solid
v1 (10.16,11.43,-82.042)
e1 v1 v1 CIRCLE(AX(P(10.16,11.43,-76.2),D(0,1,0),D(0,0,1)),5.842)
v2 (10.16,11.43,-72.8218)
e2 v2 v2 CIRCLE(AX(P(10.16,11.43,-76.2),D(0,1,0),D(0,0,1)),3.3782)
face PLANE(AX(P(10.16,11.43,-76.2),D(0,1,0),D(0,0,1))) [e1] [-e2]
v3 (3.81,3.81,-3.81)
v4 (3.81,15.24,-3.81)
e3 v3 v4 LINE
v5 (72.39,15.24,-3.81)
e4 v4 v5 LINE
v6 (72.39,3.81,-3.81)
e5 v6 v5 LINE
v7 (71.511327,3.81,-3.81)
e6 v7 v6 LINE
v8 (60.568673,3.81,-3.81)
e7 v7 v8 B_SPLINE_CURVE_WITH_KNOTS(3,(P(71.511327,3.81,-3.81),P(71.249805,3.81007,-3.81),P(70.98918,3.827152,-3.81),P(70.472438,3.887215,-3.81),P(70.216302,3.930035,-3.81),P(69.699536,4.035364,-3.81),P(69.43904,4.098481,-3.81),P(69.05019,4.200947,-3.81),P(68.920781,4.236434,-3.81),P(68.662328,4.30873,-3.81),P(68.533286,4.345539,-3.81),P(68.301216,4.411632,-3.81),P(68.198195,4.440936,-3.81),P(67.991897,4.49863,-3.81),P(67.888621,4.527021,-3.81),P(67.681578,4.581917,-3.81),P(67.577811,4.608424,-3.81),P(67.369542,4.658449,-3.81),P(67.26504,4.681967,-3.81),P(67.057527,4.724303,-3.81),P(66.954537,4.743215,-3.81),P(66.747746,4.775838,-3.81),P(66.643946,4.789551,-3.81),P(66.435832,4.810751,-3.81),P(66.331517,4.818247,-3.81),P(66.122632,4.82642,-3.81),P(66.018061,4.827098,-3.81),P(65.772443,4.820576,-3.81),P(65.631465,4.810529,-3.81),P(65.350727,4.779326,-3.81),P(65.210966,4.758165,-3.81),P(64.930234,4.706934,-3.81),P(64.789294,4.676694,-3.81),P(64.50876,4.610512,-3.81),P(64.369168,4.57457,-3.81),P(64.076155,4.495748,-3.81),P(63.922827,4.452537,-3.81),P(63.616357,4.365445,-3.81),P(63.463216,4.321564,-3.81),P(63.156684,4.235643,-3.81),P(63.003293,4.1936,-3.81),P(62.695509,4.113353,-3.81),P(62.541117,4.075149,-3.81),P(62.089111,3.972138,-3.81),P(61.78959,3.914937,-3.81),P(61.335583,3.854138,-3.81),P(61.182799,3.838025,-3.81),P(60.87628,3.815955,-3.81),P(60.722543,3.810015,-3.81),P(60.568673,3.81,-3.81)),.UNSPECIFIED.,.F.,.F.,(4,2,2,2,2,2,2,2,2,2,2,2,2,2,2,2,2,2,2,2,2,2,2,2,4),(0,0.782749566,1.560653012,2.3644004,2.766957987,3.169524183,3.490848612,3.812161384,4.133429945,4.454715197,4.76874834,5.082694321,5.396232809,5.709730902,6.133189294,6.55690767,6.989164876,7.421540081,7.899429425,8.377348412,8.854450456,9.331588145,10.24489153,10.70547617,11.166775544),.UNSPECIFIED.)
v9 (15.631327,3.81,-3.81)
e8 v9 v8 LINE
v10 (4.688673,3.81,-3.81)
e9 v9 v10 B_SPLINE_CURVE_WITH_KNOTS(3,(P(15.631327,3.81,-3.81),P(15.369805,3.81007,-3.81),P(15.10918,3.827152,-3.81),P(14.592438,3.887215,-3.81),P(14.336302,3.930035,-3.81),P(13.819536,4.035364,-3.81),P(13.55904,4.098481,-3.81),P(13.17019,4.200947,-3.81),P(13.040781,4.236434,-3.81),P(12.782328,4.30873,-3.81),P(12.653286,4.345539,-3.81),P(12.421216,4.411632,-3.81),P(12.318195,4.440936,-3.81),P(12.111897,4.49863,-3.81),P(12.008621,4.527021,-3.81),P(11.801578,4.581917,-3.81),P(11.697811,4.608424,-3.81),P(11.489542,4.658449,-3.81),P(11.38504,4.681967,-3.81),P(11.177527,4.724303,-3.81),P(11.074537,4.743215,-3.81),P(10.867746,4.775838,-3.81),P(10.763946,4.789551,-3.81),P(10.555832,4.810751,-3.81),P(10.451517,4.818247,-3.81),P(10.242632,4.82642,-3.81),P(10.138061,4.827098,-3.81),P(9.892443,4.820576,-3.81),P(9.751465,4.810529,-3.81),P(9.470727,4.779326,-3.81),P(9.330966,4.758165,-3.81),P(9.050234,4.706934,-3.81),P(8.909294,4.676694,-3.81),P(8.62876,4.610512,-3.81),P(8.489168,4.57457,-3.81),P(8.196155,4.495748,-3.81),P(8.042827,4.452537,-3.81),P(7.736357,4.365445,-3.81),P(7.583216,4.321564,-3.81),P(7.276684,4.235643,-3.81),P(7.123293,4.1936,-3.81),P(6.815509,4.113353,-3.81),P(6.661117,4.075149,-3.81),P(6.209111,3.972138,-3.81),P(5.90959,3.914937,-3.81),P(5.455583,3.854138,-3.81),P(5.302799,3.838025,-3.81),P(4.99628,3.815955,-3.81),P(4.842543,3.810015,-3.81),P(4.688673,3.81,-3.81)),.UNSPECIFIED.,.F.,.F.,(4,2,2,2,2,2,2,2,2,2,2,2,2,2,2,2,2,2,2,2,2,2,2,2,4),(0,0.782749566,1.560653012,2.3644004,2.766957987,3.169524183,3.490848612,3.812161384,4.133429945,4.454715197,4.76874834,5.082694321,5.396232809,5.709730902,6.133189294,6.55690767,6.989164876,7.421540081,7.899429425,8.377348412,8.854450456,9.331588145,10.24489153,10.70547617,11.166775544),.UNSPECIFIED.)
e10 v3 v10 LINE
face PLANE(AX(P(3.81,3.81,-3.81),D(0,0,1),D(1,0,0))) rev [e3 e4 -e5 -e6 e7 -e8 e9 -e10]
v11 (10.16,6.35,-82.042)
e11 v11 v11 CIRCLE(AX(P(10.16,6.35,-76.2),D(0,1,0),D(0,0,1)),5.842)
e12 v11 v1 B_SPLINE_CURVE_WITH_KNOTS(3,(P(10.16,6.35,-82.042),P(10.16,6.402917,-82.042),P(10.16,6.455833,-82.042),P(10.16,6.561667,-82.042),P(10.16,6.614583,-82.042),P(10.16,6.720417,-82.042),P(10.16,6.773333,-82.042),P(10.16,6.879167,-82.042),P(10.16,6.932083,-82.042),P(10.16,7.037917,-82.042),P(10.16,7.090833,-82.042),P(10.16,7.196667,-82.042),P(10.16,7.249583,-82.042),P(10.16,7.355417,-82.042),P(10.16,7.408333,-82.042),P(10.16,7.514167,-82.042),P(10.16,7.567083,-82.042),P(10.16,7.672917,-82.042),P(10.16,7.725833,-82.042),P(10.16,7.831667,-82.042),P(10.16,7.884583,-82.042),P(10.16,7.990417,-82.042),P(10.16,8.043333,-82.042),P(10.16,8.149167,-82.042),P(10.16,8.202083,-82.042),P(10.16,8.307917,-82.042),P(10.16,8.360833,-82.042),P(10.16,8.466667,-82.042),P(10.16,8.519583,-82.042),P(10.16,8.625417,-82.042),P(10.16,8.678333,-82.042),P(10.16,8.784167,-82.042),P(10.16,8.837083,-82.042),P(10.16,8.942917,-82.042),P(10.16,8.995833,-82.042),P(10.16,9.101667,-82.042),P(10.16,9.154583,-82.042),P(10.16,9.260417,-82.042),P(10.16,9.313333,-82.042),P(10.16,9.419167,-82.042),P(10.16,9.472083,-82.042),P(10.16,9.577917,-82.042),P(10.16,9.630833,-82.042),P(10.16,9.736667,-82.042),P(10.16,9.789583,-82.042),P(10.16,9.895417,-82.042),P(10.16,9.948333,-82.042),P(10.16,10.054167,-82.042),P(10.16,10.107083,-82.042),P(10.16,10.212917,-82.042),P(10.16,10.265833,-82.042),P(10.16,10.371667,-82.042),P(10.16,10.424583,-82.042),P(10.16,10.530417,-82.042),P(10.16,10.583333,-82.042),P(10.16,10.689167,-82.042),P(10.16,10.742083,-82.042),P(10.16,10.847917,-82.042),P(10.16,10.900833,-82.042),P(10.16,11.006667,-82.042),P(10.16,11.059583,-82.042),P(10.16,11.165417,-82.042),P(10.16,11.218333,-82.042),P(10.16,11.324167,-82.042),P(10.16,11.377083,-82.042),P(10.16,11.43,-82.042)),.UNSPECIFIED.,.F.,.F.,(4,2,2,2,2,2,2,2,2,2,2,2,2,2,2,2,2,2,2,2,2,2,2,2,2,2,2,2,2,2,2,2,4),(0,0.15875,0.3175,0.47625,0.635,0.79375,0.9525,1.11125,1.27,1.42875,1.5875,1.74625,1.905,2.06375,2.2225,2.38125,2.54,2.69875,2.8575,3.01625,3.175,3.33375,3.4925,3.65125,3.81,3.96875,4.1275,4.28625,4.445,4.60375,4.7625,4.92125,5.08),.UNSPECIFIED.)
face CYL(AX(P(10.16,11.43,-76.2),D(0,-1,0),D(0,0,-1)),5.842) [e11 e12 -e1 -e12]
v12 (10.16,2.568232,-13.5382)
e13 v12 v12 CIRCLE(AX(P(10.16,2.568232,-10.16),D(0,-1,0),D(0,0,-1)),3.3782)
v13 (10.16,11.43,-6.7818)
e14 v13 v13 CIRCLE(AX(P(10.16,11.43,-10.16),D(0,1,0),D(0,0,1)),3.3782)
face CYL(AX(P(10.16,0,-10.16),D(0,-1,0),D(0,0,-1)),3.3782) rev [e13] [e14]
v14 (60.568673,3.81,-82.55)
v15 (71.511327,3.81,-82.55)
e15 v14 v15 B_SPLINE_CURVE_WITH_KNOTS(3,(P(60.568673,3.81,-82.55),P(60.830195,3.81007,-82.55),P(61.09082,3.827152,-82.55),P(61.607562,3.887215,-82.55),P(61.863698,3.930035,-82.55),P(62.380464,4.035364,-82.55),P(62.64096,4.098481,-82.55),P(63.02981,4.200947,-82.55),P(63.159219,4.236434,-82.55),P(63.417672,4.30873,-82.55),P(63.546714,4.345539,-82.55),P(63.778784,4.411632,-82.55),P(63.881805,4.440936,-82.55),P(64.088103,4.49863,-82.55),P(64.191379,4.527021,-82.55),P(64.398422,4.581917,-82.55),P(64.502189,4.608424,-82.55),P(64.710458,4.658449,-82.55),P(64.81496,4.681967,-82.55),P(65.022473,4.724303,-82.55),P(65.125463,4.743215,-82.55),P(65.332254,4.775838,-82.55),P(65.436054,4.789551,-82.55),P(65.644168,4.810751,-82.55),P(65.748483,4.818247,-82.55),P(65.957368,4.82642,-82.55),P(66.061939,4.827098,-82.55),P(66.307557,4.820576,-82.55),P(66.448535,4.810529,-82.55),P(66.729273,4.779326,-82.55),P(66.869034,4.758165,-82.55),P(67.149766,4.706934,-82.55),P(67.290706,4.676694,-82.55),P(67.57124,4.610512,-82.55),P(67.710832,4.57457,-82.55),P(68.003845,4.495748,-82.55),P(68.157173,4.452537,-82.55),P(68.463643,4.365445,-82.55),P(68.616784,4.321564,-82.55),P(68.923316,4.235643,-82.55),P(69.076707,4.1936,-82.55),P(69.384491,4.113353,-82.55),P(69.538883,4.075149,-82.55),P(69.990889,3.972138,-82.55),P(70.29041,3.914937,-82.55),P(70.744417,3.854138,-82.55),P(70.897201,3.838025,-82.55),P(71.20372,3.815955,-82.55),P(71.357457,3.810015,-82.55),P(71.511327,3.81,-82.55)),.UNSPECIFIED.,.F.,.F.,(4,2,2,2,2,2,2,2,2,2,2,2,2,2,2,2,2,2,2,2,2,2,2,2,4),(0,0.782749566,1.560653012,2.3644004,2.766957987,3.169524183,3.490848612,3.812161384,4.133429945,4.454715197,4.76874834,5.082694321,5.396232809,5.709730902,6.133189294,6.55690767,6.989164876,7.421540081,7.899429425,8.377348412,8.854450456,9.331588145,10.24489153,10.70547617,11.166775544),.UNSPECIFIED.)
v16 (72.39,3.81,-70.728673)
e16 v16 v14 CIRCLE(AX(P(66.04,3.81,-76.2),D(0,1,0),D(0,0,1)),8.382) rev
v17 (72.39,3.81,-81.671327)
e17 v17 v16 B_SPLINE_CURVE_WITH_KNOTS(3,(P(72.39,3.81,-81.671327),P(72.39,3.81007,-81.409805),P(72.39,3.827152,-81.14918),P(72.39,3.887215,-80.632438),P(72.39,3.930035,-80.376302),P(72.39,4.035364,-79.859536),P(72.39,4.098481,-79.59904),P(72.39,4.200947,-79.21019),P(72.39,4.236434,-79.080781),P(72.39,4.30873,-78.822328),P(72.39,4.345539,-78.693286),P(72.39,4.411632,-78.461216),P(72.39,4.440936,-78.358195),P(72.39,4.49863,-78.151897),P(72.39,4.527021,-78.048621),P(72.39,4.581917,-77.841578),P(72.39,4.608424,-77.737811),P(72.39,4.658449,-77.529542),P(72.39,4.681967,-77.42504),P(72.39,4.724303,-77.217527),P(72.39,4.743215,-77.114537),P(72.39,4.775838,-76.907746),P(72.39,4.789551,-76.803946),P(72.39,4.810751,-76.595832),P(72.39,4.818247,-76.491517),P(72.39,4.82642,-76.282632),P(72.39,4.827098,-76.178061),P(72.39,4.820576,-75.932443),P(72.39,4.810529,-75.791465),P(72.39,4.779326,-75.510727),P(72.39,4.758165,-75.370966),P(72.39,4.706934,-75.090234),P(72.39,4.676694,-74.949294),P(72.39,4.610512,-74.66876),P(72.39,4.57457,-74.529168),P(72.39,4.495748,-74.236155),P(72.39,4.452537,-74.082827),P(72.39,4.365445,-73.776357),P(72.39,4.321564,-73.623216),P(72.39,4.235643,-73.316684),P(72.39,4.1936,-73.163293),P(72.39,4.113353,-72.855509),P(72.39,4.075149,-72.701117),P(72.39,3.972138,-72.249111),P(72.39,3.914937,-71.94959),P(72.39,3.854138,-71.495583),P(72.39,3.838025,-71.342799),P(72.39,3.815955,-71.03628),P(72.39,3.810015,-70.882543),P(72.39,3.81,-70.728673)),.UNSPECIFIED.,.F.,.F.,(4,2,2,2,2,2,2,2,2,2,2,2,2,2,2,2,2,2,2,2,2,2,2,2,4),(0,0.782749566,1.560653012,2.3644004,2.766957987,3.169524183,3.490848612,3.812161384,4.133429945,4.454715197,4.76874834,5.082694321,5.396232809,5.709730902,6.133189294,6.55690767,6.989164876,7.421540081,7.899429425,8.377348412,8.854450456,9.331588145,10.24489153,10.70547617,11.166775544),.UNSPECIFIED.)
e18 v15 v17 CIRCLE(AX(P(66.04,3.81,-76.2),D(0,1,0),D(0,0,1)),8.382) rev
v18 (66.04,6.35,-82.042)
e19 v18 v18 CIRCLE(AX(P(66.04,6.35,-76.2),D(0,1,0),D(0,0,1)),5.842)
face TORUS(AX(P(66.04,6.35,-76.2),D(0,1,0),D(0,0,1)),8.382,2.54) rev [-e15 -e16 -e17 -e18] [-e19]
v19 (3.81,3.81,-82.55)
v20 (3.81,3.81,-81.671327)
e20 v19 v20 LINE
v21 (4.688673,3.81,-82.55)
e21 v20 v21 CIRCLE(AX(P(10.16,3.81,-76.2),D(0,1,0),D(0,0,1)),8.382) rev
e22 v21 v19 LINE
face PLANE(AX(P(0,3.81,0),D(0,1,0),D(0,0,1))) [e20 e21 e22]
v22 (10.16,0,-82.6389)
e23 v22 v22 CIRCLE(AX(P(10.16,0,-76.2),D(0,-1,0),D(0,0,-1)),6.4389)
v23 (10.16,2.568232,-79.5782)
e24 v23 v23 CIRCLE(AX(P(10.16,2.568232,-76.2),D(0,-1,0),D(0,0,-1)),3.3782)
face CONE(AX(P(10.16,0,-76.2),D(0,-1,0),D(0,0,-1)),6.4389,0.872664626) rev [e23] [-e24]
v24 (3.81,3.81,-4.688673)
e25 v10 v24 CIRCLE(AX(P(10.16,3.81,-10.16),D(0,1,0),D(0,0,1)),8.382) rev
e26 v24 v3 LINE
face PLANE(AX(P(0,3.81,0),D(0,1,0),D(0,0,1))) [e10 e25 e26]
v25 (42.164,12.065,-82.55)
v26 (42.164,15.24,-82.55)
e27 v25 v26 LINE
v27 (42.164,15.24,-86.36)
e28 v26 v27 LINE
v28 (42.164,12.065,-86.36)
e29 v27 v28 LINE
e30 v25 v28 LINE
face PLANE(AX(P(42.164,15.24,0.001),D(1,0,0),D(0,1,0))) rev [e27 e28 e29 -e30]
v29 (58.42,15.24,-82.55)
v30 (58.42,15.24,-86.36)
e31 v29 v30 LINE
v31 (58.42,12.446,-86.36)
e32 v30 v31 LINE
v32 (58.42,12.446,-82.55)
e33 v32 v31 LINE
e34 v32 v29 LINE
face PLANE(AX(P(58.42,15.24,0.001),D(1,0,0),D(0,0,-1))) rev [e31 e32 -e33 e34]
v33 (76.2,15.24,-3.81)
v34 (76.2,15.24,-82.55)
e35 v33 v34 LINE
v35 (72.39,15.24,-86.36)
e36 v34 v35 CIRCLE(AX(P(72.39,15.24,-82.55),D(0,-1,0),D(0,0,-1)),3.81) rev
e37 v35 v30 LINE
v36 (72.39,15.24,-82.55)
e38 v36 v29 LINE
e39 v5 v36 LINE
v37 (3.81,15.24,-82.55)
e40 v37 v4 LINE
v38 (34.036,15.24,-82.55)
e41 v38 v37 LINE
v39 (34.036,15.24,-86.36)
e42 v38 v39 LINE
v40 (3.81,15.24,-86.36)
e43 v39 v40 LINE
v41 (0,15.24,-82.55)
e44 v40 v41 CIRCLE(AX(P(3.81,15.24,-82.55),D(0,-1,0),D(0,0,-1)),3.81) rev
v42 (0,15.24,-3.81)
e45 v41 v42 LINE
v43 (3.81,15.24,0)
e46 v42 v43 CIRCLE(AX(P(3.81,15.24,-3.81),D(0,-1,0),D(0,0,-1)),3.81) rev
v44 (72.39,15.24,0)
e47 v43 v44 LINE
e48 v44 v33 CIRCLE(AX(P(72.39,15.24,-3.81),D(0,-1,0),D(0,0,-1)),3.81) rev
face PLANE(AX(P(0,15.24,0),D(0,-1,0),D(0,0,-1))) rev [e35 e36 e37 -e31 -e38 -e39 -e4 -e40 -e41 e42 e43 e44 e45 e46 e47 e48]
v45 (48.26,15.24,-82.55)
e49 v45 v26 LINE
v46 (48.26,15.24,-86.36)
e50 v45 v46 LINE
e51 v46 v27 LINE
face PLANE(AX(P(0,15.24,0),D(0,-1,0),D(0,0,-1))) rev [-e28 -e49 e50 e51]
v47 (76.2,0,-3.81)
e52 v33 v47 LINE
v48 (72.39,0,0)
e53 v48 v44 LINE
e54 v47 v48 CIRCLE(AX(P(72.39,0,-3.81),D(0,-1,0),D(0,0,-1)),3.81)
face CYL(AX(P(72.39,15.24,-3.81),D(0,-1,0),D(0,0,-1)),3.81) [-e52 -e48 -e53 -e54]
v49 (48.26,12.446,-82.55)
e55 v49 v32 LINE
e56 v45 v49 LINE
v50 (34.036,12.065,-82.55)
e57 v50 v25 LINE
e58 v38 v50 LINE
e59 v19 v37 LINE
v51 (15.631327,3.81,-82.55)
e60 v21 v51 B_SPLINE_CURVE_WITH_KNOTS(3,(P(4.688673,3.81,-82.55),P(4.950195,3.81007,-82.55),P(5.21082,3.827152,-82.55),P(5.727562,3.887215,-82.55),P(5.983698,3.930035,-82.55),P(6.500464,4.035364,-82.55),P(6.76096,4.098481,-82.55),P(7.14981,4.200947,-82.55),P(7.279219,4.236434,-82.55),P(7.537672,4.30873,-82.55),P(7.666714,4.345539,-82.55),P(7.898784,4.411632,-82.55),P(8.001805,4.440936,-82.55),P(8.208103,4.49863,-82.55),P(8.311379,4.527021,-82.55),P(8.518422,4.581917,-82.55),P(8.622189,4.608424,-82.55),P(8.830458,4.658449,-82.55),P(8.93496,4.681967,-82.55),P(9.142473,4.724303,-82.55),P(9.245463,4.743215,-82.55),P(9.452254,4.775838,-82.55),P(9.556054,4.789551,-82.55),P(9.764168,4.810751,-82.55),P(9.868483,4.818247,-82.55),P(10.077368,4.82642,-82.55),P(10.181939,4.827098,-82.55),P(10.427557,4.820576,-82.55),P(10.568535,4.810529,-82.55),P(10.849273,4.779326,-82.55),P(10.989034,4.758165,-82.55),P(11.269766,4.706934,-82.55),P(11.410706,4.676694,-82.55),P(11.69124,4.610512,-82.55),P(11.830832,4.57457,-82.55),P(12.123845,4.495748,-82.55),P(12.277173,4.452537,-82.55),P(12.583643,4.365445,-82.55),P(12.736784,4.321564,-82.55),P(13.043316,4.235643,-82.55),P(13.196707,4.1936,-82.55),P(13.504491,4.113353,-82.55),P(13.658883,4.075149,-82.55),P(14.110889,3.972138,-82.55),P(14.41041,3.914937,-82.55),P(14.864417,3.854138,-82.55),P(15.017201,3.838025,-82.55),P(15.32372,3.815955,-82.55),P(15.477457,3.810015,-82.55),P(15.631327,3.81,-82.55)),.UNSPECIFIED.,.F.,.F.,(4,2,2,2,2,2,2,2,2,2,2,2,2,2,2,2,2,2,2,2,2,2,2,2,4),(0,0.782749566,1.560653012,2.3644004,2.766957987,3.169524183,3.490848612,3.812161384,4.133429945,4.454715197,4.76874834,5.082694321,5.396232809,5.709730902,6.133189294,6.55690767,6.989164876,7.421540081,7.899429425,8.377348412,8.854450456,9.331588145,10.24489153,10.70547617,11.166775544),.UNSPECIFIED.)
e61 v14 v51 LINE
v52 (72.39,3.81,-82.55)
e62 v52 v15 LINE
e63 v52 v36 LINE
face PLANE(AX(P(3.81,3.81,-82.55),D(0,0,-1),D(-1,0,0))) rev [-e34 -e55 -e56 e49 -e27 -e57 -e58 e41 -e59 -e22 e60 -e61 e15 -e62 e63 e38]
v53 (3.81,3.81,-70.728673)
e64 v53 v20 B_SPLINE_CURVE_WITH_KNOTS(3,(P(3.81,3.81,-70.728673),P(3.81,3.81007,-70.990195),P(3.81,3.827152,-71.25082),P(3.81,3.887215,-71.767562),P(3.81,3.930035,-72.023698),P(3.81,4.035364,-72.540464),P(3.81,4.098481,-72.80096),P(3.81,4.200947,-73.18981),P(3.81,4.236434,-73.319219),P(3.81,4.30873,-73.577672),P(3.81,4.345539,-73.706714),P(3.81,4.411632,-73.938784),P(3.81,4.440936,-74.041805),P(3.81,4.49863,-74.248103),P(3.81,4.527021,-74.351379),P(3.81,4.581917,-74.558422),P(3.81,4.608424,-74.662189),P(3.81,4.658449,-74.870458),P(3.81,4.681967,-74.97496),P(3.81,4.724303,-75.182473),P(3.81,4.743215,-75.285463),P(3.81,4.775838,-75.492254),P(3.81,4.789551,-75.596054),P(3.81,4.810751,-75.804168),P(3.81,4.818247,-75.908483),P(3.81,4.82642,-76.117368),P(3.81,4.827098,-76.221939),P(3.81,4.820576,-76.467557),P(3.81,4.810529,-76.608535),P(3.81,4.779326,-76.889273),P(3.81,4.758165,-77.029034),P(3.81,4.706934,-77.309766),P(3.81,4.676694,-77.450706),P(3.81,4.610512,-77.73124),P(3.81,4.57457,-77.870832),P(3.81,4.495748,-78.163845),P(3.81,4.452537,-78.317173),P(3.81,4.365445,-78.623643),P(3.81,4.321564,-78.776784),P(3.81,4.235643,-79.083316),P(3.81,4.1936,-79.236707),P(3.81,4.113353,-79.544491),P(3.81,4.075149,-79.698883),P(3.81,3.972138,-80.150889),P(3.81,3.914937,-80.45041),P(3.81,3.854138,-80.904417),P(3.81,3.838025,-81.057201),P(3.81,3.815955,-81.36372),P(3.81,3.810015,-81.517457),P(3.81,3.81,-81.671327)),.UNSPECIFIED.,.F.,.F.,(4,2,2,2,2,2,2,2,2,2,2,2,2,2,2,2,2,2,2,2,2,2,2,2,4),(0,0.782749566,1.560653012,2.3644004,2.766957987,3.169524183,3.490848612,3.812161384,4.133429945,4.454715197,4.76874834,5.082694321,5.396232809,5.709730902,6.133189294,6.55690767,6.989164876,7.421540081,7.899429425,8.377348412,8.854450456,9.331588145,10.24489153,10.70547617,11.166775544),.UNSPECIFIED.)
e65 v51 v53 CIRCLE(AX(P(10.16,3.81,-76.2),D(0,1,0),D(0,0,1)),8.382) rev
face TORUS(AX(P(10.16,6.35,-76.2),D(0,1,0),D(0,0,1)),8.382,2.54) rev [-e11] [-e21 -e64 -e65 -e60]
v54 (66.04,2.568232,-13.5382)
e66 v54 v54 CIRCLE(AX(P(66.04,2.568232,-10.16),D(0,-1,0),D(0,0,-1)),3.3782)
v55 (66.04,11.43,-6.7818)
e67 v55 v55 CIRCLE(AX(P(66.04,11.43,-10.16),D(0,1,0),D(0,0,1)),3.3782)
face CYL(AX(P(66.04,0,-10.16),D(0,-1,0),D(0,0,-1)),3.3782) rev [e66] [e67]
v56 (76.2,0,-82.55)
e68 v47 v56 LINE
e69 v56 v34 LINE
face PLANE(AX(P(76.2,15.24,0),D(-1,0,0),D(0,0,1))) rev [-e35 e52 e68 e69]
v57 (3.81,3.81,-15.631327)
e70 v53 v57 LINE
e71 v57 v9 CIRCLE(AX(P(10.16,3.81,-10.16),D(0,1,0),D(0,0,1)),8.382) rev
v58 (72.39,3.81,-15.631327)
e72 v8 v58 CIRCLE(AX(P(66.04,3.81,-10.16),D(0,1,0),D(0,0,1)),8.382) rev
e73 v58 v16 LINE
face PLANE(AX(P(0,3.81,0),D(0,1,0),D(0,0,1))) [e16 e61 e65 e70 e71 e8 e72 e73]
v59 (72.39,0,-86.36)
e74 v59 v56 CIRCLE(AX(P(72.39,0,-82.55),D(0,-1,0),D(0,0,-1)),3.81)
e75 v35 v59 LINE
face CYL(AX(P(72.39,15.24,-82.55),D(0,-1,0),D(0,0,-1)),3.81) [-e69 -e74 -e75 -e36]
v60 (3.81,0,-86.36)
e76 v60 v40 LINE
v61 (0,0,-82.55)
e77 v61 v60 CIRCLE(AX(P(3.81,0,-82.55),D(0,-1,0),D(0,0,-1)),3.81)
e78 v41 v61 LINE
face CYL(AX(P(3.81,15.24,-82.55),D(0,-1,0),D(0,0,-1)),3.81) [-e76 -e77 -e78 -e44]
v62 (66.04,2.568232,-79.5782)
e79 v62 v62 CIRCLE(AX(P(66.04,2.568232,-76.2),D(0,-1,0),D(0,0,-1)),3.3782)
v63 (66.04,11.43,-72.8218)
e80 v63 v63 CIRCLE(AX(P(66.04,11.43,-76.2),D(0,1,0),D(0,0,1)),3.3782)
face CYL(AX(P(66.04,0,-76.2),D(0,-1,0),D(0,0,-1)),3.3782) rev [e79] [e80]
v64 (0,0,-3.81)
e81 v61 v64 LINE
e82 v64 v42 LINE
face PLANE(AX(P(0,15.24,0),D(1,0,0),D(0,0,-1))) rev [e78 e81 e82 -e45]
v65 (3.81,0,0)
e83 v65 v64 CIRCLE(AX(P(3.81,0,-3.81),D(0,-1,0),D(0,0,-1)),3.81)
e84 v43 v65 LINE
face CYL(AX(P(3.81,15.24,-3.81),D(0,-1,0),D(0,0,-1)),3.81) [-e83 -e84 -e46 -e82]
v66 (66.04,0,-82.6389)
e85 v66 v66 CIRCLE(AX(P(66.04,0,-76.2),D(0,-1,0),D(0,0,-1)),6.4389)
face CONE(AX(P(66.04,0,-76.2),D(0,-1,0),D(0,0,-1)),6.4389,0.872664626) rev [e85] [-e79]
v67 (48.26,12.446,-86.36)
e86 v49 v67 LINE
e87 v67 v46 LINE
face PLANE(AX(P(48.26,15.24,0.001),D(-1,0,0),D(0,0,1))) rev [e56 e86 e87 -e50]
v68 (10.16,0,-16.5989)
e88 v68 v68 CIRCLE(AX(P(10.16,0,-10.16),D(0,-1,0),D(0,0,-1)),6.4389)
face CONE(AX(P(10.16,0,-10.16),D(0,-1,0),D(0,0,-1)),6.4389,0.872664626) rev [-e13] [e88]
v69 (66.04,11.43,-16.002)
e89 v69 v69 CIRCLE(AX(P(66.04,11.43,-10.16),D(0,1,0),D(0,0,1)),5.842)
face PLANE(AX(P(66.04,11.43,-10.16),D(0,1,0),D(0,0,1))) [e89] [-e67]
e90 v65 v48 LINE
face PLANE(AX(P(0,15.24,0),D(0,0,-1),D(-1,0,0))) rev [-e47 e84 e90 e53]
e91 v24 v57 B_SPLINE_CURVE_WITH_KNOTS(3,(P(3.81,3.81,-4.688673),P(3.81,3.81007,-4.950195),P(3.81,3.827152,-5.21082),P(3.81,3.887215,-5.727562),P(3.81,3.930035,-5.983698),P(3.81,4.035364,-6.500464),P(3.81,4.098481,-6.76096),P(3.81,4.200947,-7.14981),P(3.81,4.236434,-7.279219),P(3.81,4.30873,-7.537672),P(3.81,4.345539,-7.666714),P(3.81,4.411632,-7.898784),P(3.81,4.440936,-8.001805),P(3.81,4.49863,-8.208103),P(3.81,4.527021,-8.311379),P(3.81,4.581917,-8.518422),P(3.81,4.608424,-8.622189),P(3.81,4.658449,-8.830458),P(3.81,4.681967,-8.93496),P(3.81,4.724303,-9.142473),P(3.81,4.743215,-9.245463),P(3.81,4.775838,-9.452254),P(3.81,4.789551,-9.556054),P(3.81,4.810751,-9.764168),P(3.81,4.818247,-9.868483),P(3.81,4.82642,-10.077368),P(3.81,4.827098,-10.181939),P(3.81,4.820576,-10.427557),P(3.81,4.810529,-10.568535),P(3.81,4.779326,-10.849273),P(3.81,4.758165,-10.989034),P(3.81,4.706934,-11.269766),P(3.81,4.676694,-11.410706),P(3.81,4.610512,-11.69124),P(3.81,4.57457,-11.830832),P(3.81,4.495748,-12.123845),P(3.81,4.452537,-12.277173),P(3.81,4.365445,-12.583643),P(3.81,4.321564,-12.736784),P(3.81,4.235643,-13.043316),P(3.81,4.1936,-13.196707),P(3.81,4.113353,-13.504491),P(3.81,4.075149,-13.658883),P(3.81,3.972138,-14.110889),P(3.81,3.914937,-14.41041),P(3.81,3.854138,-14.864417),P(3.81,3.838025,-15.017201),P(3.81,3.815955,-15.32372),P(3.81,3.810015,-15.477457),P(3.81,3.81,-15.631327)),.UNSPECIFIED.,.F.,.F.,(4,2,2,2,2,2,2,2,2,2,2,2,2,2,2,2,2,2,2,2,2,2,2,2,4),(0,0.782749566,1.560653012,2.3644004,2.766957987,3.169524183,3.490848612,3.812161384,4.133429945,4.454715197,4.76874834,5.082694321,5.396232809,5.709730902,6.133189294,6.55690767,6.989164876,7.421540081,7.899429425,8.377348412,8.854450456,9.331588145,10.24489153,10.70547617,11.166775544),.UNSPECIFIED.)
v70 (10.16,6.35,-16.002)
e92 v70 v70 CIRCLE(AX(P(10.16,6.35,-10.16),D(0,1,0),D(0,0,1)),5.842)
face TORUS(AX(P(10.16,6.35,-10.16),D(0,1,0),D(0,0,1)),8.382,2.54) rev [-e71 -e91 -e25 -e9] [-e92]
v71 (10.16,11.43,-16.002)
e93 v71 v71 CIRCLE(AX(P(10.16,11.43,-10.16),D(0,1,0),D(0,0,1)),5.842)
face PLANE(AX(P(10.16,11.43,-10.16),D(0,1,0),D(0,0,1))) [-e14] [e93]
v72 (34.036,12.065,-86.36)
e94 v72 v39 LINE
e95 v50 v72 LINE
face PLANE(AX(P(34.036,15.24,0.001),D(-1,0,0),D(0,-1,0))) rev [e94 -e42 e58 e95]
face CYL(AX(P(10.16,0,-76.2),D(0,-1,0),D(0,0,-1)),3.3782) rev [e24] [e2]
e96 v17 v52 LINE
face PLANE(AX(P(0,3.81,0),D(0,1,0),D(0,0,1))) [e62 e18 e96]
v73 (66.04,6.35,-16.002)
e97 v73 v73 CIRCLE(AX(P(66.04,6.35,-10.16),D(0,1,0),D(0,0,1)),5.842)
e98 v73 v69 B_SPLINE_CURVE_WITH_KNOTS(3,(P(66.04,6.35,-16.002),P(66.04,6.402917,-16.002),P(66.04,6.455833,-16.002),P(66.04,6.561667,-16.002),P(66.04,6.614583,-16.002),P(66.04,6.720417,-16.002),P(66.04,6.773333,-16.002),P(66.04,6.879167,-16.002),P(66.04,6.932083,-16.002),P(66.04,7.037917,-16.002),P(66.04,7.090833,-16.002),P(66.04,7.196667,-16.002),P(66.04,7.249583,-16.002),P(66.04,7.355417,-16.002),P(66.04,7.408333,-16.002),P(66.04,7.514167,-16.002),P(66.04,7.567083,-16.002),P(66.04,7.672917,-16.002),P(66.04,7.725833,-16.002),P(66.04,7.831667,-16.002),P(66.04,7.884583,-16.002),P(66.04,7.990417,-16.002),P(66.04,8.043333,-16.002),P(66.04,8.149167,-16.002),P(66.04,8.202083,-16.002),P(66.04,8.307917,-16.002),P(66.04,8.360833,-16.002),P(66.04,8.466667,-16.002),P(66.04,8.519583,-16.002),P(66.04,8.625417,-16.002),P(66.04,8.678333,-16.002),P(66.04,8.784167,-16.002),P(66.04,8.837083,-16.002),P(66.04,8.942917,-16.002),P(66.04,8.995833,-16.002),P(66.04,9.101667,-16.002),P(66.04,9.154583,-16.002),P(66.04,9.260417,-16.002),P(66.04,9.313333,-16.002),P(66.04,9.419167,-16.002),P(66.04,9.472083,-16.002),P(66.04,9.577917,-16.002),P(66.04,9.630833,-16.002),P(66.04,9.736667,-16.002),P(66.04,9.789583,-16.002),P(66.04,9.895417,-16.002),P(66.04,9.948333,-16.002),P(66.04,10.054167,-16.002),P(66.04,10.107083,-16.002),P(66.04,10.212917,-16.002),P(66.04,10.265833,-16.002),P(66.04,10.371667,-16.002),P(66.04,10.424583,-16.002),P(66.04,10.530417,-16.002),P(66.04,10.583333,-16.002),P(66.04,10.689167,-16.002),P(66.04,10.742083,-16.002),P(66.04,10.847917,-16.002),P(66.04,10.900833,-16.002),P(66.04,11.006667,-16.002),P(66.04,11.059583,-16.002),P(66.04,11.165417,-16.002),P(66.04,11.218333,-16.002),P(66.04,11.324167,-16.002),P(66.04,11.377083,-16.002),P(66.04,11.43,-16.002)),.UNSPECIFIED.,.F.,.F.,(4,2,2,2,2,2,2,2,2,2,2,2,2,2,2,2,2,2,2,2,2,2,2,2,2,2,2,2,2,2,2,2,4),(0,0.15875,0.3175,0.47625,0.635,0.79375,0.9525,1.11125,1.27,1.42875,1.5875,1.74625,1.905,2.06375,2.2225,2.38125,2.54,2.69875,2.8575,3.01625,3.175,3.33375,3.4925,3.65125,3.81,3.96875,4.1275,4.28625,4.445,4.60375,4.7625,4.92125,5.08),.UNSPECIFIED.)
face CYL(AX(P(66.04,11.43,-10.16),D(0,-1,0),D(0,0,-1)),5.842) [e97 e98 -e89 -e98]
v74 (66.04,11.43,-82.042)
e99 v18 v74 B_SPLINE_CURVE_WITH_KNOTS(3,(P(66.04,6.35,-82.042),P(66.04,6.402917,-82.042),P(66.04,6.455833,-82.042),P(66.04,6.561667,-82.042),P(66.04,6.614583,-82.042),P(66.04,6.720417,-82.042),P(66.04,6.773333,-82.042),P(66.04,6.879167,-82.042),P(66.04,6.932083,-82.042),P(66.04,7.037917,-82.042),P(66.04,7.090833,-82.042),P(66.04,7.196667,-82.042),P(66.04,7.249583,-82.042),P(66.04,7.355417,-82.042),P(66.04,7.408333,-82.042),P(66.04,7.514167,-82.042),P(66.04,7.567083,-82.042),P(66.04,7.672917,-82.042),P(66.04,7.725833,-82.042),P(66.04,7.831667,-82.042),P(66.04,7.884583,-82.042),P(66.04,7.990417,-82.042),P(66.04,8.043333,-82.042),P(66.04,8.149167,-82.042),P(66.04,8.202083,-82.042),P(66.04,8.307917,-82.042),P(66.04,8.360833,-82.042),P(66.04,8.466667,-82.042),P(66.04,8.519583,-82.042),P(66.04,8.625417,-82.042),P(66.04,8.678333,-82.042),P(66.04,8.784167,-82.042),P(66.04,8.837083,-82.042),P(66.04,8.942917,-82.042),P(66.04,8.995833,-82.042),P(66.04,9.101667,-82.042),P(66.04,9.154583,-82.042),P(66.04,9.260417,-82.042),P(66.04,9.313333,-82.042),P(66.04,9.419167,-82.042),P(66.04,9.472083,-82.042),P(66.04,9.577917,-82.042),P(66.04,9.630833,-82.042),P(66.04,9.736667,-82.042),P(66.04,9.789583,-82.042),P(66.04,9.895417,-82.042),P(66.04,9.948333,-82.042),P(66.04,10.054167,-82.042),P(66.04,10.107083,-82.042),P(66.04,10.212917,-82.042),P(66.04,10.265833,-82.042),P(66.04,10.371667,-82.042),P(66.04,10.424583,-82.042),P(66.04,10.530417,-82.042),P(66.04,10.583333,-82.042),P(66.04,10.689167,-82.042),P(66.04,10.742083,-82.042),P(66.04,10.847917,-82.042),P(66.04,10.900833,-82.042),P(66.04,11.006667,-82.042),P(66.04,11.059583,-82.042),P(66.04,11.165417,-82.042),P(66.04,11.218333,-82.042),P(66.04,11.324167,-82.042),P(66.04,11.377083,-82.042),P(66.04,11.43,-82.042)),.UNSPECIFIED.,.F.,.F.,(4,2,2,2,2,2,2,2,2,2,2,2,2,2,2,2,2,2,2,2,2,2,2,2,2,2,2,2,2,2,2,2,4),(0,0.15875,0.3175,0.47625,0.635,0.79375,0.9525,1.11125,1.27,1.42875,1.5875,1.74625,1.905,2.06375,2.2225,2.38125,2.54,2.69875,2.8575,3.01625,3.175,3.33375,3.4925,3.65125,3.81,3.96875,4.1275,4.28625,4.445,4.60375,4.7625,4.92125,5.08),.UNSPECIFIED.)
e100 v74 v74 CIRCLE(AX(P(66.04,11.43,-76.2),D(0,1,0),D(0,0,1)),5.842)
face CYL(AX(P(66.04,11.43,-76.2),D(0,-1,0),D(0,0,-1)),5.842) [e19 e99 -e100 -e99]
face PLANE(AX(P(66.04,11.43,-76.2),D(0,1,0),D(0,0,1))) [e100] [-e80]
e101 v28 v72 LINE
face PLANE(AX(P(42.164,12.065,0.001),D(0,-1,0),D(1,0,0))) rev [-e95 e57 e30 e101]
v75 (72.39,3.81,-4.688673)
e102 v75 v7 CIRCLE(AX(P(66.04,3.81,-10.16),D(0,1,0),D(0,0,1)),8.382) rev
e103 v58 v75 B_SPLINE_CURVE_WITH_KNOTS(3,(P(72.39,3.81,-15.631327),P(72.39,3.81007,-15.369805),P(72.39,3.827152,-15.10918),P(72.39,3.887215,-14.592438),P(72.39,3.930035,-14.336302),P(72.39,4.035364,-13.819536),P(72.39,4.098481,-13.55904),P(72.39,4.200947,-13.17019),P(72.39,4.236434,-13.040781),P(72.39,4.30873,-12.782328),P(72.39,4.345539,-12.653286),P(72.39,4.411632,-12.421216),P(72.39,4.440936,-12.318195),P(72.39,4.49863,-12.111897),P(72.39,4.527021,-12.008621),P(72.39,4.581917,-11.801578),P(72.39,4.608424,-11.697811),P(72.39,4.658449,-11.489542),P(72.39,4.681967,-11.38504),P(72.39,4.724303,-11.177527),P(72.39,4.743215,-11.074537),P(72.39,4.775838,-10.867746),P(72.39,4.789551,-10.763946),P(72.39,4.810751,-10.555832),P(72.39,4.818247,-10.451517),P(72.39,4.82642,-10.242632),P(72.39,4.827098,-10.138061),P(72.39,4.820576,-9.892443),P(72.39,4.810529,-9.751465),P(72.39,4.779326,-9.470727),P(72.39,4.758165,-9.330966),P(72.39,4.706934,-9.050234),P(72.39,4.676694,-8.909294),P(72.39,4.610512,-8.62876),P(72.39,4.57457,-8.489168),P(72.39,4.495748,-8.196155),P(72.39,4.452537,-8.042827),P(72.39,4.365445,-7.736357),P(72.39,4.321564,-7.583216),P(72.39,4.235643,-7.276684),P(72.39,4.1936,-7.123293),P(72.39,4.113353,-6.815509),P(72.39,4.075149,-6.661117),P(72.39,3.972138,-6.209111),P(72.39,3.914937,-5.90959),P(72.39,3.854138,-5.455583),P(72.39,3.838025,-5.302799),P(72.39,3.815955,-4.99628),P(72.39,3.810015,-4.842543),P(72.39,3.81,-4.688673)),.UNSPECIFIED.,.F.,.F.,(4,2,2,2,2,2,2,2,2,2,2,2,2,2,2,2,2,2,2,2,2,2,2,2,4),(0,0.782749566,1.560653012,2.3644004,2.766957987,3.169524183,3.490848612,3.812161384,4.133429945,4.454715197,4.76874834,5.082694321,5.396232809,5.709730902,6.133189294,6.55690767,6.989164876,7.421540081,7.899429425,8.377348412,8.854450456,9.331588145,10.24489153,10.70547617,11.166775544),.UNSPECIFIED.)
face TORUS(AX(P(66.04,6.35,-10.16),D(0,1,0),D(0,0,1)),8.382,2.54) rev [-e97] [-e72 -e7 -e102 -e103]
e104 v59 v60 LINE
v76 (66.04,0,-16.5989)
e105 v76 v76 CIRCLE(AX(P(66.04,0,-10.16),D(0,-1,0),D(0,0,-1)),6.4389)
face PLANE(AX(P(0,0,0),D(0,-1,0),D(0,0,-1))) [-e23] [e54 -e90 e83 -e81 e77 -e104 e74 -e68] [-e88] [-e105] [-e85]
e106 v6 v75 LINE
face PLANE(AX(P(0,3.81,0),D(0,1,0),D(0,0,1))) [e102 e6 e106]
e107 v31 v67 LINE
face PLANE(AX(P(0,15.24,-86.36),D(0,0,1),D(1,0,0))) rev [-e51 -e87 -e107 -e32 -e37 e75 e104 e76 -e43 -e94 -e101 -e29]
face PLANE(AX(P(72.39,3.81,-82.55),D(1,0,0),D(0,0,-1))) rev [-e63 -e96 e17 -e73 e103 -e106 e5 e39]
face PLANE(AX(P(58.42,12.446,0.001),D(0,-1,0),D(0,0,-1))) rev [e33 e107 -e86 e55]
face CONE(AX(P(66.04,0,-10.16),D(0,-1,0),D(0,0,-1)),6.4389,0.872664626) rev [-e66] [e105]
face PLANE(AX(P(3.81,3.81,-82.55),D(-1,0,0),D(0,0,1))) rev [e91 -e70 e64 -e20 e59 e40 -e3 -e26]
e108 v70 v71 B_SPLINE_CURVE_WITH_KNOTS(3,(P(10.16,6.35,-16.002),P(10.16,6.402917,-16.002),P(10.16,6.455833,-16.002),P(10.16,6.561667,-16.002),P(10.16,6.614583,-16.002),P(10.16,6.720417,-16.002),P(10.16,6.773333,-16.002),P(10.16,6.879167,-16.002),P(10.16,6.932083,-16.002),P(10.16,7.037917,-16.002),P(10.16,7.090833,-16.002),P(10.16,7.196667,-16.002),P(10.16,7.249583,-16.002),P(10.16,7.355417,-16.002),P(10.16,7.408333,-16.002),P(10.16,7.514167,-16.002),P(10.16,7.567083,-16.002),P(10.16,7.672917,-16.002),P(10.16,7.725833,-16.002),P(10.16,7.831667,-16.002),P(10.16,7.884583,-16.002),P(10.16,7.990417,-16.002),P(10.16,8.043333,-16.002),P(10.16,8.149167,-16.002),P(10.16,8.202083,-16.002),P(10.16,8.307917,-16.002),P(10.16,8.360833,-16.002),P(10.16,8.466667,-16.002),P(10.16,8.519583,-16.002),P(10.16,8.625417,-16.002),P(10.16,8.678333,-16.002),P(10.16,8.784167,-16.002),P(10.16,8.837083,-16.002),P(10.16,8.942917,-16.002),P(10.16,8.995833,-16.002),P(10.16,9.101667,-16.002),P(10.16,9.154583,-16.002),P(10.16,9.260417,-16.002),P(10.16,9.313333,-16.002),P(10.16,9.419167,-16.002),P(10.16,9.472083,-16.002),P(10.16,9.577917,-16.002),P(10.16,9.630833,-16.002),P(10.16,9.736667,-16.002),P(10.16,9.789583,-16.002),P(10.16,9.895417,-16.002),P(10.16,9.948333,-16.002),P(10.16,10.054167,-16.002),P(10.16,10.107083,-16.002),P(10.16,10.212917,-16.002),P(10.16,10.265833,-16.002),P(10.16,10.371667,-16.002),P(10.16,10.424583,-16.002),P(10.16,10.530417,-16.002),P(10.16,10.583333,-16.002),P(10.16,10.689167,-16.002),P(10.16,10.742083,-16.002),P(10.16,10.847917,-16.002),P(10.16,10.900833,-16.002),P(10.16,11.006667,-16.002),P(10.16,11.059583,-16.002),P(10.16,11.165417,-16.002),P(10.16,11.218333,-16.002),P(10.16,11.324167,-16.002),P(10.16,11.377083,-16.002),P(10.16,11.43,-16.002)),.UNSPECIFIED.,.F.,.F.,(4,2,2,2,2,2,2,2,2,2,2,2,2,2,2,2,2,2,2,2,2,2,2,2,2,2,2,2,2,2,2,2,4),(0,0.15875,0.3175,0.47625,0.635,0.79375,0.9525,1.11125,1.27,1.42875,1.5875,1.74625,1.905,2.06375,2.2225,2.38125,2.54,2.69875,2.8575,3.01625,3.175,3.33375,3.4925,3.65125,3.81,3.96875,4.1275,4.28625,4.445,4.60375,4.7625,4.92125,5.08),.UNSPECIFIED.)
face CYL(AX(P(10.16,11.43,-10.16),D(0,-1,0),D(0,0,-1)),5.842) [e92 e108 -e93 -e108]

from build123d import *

# Parameters (mm, degrees)
SKETCH3_W                                           = 76.2
SKETCH3_H                                           = 86.36
BOSS_EXTRUDE2_DEPTH                                 = 15.24
SKETCH6_W                                           = 68.58
SKETCH6_H                                           = 78.74
CUT_EXTRUDE2_DEPTH                                  = 11.43
SKETCH7_R                                           = 5.842
SKETCH7_R_2                                         = 3.302
BOSS_EXTRUDE3_DEPTH                                 = 7.62
FILLET1_R                                           = 2.54
CSK_FOR_1_4_FLAT_HEAD_MACHINE_SCREW_100_D           = 6.7564
CSK_FOR_1_4_FLAT_HEAD_MACHINE_SCREW_100_DEPTH       = 91.44
CSK_FOR_1_4_FLAT_HEAD_MACHINE_SCREW_100_CSINK_D     = 12.8778
CSK_FOR_1_4_FLAT_HEAD_MACHINE_SCREW_100_CSINK_ANGLE = 100
CSK_FOR_1_4_FLAT_HEAD_MACHINE_SCREW_100_TIP         = 2.029827343
CUT_EXTRUDE4_REACH                                  = 118.176
SKETCH11_W                                          = 8.128
SKETCH11_H                                          = 3.175
CUT_EXTRUDE5_REACH                                  = 118.176
SKETCH12_W                                          = 10.16
SKETCH12_H                                          = 2.794
FILLET2_R                                           = 3.81


with BuildPart() as part:
    # Sketch3 → Boss-Extrude2 (new body)
    with BuildSketch(Plane(origin=(0, 0, 0), x_dir=(1, 0, 0), z_dir=(0, 1, 0))):
        with Locations((38.1, 43.18)):
            Rectangle(SKETCH3_W, SKETCH3_H)
    extrude(amount=BOSS_EXTRUDE2_DEPTH)

    # Sketch6 → Cut-Extrude2 (cut)
    with BuildSketch(Plane(origin=(0, 15.24, 0), x_dir=(1, 0, 0), z_dir=(0, 1, 0))):
        with Locations((38.1, 43.18)):
            Rectangle(SKETCH6_W, SKETCH6_H)
    extrude(amount=-CUT_EXTRUDE2_DEPTH, mode=Mode.SUBTRACT)

    # Sketch7 → Boss-Extrude3 (add)
    # profile 1 of 4: a face of its own
    with BuildSketch(Plane(origin=(0, 3.81, 0), x_dir=(1, 0, 0), z_dir=(0, 1, 0))):
        with Locations(Location((10.16, 76.2, 0), (0, 0, 90))):
            Circle(SKETCH7_R)
        with Locations(Location((10.16, 76.2, 0), (0, 0, 90))):
            Circle(SKETCH7_R_2, mode=Mode.SUBTRACT)
    # profile 2 of 4: a face of its own
    with BuildSketch(Plane(origin=(0, 3.81, 0), x_dir=(1, 0, 0), z_dir=(0, 1, 0))):
        with Locations(Location((66.04, 76.2, 0), (0, 0, 90))):
            Circle(SKETCH7_R)
        with Locations(Location((66.04, 76.2, 0), (0, 0, 90))):
            Circle(SKETCH7_R_2, mode=Mode.SUBTRACT)
    # profile 3 of 4: a face of its own
    with BuildSketch(Plane(origin=(0, 3.81, 0), x_dir=(1, 0, 0), z_dir=(0, 1, 0))):
        with Locations(Location((10.16, 10.16, 0), (0, 0, 90))):
            Circle(SKETCH7_R)
        with Locations(Location((10.16, 10.16, 0), (0, 0, 90))):
            Circle(SKETCH7_R_2, mode=Mode.SUBTRACT)
    # profile 4 of 4: a face of its own
    with BuildSketch(Plane(origin=(0, 3.81, 0), x_dir=(1, 0, 0), z_dir=(0, 1, 0))):
        with Locations(Location((66.04, 10.16, 0), (0, 0, 90))):
            Circle(SKETCH7_R)
        with Locations(Location((66.04, 10.16, 0), (0, 0, 90))):
            Circle(SKETCH7_R_2, mode=Mode.SUBTRACT)
    extrude(amount=BOSS_EXTRUDE3_DEPTH)

    # Fillet1
    # the kernel refuses this fillet: 2.54 mm, written as the material it adds along each edge
    with BuildSketch(Plane(origin=(10.16, 3.81, -76.2), x_dir=(0, 0, -1), z_dir=(1, 0, 0))) as fillet1_piece_1:
        with BuildLine():
            CenterArc((5.842 + FILLET1_R, FILLET1_R), FILLET1_R, 180, 90)
            Line((5.842, FILLET1_R), (5.842, 0))
            Line((5.842, 0), (5.842 + FILLET1_R, 0))
        make_face()
    revolve(axis=Axis((10.16, 3.81, -76.2), (0, 1, 0)))
    with BuildSketch(Plane(origin=(66.04, 3.81, -76.2), x_dir=(0, 0, -1), z_dir=(1, 0, 0))) as fillet1_piece_2:
        with BuildLine():
            CenterArc((5.842 + FILLET1_R, FILLET1_R), FILLET1_R, 180, 90)
            Line((5.842, FILLET1_R), (5.842, 0))
            Line((5.842, 0), (5.842 + FILLET1_R, 0))
        make_face()
    revolve(axis=Axis((66.04, 3.81, -76.2), (0, 1, 0)))
    with BuildSketch(Plane(origin=(10.16, 3.81, -10.16), x_dir=(0, 0, -1), z_dir=(1, 0, 0))) as fillet1_piece_3:
        with BuildLine():
            CenterArc((5.842 + FILLET1_R, FILLET1_R), FILLET1_R, 180, 90)
            Line((5.842, FILLET1_R), (5.842, 0))
            Line((5.842, 0), (5.842 + FILLET1_R, 0))
        make_face()
    revolve(axis=Axis((10.16, 3.81, -10.16), (0, 1, 0)))
    with BuildSketch(Plane(origin=(66.04, 3.81, -10.16), x_dir=(0, 0, -1), z_dir=(1, 0, 0))) as fillet1_piece_4:
        with BuildLine():
            CenterArc((5.842 + FILLET1_R, FILLET1_R), FILLET1_R, 180, 90)
            Line((5.842, FILLET1_R), (5.842, 0))
            Line((5.842, 0), (5.842 + FILLET1_R, 0))
        make_face()
    revolve(axis=Axis((66.04, 3.81, -10.16), (0, 1, 0)))

    # CSK for 1/4 Flat Head Machine Screw (100)1
    with Locations(Plane(origin=(0, 0, 0), x_dir=(-1, 0, 0), z_dir=(0, -1, 0))):
        with Locations((-10.16, 10.16), (-66.04, 10.16), (-66.04, 76.2), (-10.16, 76.2)):
            CounterSinkHole(CSK_FOR_1_4_FLAT_HEAD_MACHINE_SCREW_100_D / 2, CSK_FOR_1_4_FLAT_HEAD_MACHINE_SCREW_100_CSINK_D / 2, depth=CSK_FOR_1_4_FLAT_HEAD_MACHINE_SCREW_100_DEPTH, counter_sink_angle=CSK_FOR_1_4_FLAT_HEAD_MACHINE_SCREW_100_CSINK_ANGLE)
            with Locations((0, 0, -(CSK_FOR_1_4_FLAT_HEAD_MACHINE_SCREW_100_DEPTH + CSK_FOR_1_4_FLAT_HEAD_MACHINE_SCREW_100_TIP / 2))):  # 118° drill point
                Cone(0, CSK_FOR_1_4_FLAT_HEAD_MACHINE_SCREW_100_D / 2, CSK_FOR_1_4_FLAT_HEAD_MACHINE_SCREW_100_TIP, mode=Mode.SUBTRACT)

    # Sketch11 → Cut-Extrude4 (cut, up to next)
    with BuildSketch(Plane(origin=(0, 0, -86.36), x_dir=(-1, 0, 0), z_dir=(0, 0, -1)), mode=Mode.PRIVATE) as cut_extrude4_sk1:
        with Locations((-38.1, 13.6525)):
            Rectangle(SKETCH11_W, SKETCH11_H)
    cut_extrude4_tool1 = extrude(cut_extrude4_sk1.sketch, amount=-CUT_EXTRUDE4_REACH, mode=Mode.PRIVATE) & part.part
    add(cut_extrude4_tool1.solids().sort_by_distance((38.1, 13.6525, -86.36))[0], mode=Mode.SUBTRACT)

    # Sketch12 → Cut-Extrude5 (cut, up to next)
    with BuildSketch(Plane(origin=(0, 0, -86.36), x_dir=(-1, 0, 0), z_dir=(0, 0, -1)), mode=Mode.PRIVATE) as cut_extrude5_sk1:
        with Locations((-53.34, 13.843)):
            Rectangle(SKETCH12_W, SKETCH12_H)
    cut_extrude5_tool1 = extrude(cut_extrude5_sk1.sketch, amount=-CUT_EXTRUDE5_REACH, mode=Mode.PRIVATE) & part.part
    add(cut_extrude5_tool1.solids().sort_by_distance((53.34, 13.843, -86.36))[0], mode=Mode.SUBTRACT)

    # Fillet2
    fillet2_edges = [part.edges().sort_by_distance(p)[0] for p in [
        (0, 7.62, -86.36),
        (76.2, 7.62, -86.36),
        (76.2, 7.62, 0),
        (0, 7.62, 0),
    ]]
    fillet(fillet2_edges, radius=FILLET2_R)


solid = part.part
